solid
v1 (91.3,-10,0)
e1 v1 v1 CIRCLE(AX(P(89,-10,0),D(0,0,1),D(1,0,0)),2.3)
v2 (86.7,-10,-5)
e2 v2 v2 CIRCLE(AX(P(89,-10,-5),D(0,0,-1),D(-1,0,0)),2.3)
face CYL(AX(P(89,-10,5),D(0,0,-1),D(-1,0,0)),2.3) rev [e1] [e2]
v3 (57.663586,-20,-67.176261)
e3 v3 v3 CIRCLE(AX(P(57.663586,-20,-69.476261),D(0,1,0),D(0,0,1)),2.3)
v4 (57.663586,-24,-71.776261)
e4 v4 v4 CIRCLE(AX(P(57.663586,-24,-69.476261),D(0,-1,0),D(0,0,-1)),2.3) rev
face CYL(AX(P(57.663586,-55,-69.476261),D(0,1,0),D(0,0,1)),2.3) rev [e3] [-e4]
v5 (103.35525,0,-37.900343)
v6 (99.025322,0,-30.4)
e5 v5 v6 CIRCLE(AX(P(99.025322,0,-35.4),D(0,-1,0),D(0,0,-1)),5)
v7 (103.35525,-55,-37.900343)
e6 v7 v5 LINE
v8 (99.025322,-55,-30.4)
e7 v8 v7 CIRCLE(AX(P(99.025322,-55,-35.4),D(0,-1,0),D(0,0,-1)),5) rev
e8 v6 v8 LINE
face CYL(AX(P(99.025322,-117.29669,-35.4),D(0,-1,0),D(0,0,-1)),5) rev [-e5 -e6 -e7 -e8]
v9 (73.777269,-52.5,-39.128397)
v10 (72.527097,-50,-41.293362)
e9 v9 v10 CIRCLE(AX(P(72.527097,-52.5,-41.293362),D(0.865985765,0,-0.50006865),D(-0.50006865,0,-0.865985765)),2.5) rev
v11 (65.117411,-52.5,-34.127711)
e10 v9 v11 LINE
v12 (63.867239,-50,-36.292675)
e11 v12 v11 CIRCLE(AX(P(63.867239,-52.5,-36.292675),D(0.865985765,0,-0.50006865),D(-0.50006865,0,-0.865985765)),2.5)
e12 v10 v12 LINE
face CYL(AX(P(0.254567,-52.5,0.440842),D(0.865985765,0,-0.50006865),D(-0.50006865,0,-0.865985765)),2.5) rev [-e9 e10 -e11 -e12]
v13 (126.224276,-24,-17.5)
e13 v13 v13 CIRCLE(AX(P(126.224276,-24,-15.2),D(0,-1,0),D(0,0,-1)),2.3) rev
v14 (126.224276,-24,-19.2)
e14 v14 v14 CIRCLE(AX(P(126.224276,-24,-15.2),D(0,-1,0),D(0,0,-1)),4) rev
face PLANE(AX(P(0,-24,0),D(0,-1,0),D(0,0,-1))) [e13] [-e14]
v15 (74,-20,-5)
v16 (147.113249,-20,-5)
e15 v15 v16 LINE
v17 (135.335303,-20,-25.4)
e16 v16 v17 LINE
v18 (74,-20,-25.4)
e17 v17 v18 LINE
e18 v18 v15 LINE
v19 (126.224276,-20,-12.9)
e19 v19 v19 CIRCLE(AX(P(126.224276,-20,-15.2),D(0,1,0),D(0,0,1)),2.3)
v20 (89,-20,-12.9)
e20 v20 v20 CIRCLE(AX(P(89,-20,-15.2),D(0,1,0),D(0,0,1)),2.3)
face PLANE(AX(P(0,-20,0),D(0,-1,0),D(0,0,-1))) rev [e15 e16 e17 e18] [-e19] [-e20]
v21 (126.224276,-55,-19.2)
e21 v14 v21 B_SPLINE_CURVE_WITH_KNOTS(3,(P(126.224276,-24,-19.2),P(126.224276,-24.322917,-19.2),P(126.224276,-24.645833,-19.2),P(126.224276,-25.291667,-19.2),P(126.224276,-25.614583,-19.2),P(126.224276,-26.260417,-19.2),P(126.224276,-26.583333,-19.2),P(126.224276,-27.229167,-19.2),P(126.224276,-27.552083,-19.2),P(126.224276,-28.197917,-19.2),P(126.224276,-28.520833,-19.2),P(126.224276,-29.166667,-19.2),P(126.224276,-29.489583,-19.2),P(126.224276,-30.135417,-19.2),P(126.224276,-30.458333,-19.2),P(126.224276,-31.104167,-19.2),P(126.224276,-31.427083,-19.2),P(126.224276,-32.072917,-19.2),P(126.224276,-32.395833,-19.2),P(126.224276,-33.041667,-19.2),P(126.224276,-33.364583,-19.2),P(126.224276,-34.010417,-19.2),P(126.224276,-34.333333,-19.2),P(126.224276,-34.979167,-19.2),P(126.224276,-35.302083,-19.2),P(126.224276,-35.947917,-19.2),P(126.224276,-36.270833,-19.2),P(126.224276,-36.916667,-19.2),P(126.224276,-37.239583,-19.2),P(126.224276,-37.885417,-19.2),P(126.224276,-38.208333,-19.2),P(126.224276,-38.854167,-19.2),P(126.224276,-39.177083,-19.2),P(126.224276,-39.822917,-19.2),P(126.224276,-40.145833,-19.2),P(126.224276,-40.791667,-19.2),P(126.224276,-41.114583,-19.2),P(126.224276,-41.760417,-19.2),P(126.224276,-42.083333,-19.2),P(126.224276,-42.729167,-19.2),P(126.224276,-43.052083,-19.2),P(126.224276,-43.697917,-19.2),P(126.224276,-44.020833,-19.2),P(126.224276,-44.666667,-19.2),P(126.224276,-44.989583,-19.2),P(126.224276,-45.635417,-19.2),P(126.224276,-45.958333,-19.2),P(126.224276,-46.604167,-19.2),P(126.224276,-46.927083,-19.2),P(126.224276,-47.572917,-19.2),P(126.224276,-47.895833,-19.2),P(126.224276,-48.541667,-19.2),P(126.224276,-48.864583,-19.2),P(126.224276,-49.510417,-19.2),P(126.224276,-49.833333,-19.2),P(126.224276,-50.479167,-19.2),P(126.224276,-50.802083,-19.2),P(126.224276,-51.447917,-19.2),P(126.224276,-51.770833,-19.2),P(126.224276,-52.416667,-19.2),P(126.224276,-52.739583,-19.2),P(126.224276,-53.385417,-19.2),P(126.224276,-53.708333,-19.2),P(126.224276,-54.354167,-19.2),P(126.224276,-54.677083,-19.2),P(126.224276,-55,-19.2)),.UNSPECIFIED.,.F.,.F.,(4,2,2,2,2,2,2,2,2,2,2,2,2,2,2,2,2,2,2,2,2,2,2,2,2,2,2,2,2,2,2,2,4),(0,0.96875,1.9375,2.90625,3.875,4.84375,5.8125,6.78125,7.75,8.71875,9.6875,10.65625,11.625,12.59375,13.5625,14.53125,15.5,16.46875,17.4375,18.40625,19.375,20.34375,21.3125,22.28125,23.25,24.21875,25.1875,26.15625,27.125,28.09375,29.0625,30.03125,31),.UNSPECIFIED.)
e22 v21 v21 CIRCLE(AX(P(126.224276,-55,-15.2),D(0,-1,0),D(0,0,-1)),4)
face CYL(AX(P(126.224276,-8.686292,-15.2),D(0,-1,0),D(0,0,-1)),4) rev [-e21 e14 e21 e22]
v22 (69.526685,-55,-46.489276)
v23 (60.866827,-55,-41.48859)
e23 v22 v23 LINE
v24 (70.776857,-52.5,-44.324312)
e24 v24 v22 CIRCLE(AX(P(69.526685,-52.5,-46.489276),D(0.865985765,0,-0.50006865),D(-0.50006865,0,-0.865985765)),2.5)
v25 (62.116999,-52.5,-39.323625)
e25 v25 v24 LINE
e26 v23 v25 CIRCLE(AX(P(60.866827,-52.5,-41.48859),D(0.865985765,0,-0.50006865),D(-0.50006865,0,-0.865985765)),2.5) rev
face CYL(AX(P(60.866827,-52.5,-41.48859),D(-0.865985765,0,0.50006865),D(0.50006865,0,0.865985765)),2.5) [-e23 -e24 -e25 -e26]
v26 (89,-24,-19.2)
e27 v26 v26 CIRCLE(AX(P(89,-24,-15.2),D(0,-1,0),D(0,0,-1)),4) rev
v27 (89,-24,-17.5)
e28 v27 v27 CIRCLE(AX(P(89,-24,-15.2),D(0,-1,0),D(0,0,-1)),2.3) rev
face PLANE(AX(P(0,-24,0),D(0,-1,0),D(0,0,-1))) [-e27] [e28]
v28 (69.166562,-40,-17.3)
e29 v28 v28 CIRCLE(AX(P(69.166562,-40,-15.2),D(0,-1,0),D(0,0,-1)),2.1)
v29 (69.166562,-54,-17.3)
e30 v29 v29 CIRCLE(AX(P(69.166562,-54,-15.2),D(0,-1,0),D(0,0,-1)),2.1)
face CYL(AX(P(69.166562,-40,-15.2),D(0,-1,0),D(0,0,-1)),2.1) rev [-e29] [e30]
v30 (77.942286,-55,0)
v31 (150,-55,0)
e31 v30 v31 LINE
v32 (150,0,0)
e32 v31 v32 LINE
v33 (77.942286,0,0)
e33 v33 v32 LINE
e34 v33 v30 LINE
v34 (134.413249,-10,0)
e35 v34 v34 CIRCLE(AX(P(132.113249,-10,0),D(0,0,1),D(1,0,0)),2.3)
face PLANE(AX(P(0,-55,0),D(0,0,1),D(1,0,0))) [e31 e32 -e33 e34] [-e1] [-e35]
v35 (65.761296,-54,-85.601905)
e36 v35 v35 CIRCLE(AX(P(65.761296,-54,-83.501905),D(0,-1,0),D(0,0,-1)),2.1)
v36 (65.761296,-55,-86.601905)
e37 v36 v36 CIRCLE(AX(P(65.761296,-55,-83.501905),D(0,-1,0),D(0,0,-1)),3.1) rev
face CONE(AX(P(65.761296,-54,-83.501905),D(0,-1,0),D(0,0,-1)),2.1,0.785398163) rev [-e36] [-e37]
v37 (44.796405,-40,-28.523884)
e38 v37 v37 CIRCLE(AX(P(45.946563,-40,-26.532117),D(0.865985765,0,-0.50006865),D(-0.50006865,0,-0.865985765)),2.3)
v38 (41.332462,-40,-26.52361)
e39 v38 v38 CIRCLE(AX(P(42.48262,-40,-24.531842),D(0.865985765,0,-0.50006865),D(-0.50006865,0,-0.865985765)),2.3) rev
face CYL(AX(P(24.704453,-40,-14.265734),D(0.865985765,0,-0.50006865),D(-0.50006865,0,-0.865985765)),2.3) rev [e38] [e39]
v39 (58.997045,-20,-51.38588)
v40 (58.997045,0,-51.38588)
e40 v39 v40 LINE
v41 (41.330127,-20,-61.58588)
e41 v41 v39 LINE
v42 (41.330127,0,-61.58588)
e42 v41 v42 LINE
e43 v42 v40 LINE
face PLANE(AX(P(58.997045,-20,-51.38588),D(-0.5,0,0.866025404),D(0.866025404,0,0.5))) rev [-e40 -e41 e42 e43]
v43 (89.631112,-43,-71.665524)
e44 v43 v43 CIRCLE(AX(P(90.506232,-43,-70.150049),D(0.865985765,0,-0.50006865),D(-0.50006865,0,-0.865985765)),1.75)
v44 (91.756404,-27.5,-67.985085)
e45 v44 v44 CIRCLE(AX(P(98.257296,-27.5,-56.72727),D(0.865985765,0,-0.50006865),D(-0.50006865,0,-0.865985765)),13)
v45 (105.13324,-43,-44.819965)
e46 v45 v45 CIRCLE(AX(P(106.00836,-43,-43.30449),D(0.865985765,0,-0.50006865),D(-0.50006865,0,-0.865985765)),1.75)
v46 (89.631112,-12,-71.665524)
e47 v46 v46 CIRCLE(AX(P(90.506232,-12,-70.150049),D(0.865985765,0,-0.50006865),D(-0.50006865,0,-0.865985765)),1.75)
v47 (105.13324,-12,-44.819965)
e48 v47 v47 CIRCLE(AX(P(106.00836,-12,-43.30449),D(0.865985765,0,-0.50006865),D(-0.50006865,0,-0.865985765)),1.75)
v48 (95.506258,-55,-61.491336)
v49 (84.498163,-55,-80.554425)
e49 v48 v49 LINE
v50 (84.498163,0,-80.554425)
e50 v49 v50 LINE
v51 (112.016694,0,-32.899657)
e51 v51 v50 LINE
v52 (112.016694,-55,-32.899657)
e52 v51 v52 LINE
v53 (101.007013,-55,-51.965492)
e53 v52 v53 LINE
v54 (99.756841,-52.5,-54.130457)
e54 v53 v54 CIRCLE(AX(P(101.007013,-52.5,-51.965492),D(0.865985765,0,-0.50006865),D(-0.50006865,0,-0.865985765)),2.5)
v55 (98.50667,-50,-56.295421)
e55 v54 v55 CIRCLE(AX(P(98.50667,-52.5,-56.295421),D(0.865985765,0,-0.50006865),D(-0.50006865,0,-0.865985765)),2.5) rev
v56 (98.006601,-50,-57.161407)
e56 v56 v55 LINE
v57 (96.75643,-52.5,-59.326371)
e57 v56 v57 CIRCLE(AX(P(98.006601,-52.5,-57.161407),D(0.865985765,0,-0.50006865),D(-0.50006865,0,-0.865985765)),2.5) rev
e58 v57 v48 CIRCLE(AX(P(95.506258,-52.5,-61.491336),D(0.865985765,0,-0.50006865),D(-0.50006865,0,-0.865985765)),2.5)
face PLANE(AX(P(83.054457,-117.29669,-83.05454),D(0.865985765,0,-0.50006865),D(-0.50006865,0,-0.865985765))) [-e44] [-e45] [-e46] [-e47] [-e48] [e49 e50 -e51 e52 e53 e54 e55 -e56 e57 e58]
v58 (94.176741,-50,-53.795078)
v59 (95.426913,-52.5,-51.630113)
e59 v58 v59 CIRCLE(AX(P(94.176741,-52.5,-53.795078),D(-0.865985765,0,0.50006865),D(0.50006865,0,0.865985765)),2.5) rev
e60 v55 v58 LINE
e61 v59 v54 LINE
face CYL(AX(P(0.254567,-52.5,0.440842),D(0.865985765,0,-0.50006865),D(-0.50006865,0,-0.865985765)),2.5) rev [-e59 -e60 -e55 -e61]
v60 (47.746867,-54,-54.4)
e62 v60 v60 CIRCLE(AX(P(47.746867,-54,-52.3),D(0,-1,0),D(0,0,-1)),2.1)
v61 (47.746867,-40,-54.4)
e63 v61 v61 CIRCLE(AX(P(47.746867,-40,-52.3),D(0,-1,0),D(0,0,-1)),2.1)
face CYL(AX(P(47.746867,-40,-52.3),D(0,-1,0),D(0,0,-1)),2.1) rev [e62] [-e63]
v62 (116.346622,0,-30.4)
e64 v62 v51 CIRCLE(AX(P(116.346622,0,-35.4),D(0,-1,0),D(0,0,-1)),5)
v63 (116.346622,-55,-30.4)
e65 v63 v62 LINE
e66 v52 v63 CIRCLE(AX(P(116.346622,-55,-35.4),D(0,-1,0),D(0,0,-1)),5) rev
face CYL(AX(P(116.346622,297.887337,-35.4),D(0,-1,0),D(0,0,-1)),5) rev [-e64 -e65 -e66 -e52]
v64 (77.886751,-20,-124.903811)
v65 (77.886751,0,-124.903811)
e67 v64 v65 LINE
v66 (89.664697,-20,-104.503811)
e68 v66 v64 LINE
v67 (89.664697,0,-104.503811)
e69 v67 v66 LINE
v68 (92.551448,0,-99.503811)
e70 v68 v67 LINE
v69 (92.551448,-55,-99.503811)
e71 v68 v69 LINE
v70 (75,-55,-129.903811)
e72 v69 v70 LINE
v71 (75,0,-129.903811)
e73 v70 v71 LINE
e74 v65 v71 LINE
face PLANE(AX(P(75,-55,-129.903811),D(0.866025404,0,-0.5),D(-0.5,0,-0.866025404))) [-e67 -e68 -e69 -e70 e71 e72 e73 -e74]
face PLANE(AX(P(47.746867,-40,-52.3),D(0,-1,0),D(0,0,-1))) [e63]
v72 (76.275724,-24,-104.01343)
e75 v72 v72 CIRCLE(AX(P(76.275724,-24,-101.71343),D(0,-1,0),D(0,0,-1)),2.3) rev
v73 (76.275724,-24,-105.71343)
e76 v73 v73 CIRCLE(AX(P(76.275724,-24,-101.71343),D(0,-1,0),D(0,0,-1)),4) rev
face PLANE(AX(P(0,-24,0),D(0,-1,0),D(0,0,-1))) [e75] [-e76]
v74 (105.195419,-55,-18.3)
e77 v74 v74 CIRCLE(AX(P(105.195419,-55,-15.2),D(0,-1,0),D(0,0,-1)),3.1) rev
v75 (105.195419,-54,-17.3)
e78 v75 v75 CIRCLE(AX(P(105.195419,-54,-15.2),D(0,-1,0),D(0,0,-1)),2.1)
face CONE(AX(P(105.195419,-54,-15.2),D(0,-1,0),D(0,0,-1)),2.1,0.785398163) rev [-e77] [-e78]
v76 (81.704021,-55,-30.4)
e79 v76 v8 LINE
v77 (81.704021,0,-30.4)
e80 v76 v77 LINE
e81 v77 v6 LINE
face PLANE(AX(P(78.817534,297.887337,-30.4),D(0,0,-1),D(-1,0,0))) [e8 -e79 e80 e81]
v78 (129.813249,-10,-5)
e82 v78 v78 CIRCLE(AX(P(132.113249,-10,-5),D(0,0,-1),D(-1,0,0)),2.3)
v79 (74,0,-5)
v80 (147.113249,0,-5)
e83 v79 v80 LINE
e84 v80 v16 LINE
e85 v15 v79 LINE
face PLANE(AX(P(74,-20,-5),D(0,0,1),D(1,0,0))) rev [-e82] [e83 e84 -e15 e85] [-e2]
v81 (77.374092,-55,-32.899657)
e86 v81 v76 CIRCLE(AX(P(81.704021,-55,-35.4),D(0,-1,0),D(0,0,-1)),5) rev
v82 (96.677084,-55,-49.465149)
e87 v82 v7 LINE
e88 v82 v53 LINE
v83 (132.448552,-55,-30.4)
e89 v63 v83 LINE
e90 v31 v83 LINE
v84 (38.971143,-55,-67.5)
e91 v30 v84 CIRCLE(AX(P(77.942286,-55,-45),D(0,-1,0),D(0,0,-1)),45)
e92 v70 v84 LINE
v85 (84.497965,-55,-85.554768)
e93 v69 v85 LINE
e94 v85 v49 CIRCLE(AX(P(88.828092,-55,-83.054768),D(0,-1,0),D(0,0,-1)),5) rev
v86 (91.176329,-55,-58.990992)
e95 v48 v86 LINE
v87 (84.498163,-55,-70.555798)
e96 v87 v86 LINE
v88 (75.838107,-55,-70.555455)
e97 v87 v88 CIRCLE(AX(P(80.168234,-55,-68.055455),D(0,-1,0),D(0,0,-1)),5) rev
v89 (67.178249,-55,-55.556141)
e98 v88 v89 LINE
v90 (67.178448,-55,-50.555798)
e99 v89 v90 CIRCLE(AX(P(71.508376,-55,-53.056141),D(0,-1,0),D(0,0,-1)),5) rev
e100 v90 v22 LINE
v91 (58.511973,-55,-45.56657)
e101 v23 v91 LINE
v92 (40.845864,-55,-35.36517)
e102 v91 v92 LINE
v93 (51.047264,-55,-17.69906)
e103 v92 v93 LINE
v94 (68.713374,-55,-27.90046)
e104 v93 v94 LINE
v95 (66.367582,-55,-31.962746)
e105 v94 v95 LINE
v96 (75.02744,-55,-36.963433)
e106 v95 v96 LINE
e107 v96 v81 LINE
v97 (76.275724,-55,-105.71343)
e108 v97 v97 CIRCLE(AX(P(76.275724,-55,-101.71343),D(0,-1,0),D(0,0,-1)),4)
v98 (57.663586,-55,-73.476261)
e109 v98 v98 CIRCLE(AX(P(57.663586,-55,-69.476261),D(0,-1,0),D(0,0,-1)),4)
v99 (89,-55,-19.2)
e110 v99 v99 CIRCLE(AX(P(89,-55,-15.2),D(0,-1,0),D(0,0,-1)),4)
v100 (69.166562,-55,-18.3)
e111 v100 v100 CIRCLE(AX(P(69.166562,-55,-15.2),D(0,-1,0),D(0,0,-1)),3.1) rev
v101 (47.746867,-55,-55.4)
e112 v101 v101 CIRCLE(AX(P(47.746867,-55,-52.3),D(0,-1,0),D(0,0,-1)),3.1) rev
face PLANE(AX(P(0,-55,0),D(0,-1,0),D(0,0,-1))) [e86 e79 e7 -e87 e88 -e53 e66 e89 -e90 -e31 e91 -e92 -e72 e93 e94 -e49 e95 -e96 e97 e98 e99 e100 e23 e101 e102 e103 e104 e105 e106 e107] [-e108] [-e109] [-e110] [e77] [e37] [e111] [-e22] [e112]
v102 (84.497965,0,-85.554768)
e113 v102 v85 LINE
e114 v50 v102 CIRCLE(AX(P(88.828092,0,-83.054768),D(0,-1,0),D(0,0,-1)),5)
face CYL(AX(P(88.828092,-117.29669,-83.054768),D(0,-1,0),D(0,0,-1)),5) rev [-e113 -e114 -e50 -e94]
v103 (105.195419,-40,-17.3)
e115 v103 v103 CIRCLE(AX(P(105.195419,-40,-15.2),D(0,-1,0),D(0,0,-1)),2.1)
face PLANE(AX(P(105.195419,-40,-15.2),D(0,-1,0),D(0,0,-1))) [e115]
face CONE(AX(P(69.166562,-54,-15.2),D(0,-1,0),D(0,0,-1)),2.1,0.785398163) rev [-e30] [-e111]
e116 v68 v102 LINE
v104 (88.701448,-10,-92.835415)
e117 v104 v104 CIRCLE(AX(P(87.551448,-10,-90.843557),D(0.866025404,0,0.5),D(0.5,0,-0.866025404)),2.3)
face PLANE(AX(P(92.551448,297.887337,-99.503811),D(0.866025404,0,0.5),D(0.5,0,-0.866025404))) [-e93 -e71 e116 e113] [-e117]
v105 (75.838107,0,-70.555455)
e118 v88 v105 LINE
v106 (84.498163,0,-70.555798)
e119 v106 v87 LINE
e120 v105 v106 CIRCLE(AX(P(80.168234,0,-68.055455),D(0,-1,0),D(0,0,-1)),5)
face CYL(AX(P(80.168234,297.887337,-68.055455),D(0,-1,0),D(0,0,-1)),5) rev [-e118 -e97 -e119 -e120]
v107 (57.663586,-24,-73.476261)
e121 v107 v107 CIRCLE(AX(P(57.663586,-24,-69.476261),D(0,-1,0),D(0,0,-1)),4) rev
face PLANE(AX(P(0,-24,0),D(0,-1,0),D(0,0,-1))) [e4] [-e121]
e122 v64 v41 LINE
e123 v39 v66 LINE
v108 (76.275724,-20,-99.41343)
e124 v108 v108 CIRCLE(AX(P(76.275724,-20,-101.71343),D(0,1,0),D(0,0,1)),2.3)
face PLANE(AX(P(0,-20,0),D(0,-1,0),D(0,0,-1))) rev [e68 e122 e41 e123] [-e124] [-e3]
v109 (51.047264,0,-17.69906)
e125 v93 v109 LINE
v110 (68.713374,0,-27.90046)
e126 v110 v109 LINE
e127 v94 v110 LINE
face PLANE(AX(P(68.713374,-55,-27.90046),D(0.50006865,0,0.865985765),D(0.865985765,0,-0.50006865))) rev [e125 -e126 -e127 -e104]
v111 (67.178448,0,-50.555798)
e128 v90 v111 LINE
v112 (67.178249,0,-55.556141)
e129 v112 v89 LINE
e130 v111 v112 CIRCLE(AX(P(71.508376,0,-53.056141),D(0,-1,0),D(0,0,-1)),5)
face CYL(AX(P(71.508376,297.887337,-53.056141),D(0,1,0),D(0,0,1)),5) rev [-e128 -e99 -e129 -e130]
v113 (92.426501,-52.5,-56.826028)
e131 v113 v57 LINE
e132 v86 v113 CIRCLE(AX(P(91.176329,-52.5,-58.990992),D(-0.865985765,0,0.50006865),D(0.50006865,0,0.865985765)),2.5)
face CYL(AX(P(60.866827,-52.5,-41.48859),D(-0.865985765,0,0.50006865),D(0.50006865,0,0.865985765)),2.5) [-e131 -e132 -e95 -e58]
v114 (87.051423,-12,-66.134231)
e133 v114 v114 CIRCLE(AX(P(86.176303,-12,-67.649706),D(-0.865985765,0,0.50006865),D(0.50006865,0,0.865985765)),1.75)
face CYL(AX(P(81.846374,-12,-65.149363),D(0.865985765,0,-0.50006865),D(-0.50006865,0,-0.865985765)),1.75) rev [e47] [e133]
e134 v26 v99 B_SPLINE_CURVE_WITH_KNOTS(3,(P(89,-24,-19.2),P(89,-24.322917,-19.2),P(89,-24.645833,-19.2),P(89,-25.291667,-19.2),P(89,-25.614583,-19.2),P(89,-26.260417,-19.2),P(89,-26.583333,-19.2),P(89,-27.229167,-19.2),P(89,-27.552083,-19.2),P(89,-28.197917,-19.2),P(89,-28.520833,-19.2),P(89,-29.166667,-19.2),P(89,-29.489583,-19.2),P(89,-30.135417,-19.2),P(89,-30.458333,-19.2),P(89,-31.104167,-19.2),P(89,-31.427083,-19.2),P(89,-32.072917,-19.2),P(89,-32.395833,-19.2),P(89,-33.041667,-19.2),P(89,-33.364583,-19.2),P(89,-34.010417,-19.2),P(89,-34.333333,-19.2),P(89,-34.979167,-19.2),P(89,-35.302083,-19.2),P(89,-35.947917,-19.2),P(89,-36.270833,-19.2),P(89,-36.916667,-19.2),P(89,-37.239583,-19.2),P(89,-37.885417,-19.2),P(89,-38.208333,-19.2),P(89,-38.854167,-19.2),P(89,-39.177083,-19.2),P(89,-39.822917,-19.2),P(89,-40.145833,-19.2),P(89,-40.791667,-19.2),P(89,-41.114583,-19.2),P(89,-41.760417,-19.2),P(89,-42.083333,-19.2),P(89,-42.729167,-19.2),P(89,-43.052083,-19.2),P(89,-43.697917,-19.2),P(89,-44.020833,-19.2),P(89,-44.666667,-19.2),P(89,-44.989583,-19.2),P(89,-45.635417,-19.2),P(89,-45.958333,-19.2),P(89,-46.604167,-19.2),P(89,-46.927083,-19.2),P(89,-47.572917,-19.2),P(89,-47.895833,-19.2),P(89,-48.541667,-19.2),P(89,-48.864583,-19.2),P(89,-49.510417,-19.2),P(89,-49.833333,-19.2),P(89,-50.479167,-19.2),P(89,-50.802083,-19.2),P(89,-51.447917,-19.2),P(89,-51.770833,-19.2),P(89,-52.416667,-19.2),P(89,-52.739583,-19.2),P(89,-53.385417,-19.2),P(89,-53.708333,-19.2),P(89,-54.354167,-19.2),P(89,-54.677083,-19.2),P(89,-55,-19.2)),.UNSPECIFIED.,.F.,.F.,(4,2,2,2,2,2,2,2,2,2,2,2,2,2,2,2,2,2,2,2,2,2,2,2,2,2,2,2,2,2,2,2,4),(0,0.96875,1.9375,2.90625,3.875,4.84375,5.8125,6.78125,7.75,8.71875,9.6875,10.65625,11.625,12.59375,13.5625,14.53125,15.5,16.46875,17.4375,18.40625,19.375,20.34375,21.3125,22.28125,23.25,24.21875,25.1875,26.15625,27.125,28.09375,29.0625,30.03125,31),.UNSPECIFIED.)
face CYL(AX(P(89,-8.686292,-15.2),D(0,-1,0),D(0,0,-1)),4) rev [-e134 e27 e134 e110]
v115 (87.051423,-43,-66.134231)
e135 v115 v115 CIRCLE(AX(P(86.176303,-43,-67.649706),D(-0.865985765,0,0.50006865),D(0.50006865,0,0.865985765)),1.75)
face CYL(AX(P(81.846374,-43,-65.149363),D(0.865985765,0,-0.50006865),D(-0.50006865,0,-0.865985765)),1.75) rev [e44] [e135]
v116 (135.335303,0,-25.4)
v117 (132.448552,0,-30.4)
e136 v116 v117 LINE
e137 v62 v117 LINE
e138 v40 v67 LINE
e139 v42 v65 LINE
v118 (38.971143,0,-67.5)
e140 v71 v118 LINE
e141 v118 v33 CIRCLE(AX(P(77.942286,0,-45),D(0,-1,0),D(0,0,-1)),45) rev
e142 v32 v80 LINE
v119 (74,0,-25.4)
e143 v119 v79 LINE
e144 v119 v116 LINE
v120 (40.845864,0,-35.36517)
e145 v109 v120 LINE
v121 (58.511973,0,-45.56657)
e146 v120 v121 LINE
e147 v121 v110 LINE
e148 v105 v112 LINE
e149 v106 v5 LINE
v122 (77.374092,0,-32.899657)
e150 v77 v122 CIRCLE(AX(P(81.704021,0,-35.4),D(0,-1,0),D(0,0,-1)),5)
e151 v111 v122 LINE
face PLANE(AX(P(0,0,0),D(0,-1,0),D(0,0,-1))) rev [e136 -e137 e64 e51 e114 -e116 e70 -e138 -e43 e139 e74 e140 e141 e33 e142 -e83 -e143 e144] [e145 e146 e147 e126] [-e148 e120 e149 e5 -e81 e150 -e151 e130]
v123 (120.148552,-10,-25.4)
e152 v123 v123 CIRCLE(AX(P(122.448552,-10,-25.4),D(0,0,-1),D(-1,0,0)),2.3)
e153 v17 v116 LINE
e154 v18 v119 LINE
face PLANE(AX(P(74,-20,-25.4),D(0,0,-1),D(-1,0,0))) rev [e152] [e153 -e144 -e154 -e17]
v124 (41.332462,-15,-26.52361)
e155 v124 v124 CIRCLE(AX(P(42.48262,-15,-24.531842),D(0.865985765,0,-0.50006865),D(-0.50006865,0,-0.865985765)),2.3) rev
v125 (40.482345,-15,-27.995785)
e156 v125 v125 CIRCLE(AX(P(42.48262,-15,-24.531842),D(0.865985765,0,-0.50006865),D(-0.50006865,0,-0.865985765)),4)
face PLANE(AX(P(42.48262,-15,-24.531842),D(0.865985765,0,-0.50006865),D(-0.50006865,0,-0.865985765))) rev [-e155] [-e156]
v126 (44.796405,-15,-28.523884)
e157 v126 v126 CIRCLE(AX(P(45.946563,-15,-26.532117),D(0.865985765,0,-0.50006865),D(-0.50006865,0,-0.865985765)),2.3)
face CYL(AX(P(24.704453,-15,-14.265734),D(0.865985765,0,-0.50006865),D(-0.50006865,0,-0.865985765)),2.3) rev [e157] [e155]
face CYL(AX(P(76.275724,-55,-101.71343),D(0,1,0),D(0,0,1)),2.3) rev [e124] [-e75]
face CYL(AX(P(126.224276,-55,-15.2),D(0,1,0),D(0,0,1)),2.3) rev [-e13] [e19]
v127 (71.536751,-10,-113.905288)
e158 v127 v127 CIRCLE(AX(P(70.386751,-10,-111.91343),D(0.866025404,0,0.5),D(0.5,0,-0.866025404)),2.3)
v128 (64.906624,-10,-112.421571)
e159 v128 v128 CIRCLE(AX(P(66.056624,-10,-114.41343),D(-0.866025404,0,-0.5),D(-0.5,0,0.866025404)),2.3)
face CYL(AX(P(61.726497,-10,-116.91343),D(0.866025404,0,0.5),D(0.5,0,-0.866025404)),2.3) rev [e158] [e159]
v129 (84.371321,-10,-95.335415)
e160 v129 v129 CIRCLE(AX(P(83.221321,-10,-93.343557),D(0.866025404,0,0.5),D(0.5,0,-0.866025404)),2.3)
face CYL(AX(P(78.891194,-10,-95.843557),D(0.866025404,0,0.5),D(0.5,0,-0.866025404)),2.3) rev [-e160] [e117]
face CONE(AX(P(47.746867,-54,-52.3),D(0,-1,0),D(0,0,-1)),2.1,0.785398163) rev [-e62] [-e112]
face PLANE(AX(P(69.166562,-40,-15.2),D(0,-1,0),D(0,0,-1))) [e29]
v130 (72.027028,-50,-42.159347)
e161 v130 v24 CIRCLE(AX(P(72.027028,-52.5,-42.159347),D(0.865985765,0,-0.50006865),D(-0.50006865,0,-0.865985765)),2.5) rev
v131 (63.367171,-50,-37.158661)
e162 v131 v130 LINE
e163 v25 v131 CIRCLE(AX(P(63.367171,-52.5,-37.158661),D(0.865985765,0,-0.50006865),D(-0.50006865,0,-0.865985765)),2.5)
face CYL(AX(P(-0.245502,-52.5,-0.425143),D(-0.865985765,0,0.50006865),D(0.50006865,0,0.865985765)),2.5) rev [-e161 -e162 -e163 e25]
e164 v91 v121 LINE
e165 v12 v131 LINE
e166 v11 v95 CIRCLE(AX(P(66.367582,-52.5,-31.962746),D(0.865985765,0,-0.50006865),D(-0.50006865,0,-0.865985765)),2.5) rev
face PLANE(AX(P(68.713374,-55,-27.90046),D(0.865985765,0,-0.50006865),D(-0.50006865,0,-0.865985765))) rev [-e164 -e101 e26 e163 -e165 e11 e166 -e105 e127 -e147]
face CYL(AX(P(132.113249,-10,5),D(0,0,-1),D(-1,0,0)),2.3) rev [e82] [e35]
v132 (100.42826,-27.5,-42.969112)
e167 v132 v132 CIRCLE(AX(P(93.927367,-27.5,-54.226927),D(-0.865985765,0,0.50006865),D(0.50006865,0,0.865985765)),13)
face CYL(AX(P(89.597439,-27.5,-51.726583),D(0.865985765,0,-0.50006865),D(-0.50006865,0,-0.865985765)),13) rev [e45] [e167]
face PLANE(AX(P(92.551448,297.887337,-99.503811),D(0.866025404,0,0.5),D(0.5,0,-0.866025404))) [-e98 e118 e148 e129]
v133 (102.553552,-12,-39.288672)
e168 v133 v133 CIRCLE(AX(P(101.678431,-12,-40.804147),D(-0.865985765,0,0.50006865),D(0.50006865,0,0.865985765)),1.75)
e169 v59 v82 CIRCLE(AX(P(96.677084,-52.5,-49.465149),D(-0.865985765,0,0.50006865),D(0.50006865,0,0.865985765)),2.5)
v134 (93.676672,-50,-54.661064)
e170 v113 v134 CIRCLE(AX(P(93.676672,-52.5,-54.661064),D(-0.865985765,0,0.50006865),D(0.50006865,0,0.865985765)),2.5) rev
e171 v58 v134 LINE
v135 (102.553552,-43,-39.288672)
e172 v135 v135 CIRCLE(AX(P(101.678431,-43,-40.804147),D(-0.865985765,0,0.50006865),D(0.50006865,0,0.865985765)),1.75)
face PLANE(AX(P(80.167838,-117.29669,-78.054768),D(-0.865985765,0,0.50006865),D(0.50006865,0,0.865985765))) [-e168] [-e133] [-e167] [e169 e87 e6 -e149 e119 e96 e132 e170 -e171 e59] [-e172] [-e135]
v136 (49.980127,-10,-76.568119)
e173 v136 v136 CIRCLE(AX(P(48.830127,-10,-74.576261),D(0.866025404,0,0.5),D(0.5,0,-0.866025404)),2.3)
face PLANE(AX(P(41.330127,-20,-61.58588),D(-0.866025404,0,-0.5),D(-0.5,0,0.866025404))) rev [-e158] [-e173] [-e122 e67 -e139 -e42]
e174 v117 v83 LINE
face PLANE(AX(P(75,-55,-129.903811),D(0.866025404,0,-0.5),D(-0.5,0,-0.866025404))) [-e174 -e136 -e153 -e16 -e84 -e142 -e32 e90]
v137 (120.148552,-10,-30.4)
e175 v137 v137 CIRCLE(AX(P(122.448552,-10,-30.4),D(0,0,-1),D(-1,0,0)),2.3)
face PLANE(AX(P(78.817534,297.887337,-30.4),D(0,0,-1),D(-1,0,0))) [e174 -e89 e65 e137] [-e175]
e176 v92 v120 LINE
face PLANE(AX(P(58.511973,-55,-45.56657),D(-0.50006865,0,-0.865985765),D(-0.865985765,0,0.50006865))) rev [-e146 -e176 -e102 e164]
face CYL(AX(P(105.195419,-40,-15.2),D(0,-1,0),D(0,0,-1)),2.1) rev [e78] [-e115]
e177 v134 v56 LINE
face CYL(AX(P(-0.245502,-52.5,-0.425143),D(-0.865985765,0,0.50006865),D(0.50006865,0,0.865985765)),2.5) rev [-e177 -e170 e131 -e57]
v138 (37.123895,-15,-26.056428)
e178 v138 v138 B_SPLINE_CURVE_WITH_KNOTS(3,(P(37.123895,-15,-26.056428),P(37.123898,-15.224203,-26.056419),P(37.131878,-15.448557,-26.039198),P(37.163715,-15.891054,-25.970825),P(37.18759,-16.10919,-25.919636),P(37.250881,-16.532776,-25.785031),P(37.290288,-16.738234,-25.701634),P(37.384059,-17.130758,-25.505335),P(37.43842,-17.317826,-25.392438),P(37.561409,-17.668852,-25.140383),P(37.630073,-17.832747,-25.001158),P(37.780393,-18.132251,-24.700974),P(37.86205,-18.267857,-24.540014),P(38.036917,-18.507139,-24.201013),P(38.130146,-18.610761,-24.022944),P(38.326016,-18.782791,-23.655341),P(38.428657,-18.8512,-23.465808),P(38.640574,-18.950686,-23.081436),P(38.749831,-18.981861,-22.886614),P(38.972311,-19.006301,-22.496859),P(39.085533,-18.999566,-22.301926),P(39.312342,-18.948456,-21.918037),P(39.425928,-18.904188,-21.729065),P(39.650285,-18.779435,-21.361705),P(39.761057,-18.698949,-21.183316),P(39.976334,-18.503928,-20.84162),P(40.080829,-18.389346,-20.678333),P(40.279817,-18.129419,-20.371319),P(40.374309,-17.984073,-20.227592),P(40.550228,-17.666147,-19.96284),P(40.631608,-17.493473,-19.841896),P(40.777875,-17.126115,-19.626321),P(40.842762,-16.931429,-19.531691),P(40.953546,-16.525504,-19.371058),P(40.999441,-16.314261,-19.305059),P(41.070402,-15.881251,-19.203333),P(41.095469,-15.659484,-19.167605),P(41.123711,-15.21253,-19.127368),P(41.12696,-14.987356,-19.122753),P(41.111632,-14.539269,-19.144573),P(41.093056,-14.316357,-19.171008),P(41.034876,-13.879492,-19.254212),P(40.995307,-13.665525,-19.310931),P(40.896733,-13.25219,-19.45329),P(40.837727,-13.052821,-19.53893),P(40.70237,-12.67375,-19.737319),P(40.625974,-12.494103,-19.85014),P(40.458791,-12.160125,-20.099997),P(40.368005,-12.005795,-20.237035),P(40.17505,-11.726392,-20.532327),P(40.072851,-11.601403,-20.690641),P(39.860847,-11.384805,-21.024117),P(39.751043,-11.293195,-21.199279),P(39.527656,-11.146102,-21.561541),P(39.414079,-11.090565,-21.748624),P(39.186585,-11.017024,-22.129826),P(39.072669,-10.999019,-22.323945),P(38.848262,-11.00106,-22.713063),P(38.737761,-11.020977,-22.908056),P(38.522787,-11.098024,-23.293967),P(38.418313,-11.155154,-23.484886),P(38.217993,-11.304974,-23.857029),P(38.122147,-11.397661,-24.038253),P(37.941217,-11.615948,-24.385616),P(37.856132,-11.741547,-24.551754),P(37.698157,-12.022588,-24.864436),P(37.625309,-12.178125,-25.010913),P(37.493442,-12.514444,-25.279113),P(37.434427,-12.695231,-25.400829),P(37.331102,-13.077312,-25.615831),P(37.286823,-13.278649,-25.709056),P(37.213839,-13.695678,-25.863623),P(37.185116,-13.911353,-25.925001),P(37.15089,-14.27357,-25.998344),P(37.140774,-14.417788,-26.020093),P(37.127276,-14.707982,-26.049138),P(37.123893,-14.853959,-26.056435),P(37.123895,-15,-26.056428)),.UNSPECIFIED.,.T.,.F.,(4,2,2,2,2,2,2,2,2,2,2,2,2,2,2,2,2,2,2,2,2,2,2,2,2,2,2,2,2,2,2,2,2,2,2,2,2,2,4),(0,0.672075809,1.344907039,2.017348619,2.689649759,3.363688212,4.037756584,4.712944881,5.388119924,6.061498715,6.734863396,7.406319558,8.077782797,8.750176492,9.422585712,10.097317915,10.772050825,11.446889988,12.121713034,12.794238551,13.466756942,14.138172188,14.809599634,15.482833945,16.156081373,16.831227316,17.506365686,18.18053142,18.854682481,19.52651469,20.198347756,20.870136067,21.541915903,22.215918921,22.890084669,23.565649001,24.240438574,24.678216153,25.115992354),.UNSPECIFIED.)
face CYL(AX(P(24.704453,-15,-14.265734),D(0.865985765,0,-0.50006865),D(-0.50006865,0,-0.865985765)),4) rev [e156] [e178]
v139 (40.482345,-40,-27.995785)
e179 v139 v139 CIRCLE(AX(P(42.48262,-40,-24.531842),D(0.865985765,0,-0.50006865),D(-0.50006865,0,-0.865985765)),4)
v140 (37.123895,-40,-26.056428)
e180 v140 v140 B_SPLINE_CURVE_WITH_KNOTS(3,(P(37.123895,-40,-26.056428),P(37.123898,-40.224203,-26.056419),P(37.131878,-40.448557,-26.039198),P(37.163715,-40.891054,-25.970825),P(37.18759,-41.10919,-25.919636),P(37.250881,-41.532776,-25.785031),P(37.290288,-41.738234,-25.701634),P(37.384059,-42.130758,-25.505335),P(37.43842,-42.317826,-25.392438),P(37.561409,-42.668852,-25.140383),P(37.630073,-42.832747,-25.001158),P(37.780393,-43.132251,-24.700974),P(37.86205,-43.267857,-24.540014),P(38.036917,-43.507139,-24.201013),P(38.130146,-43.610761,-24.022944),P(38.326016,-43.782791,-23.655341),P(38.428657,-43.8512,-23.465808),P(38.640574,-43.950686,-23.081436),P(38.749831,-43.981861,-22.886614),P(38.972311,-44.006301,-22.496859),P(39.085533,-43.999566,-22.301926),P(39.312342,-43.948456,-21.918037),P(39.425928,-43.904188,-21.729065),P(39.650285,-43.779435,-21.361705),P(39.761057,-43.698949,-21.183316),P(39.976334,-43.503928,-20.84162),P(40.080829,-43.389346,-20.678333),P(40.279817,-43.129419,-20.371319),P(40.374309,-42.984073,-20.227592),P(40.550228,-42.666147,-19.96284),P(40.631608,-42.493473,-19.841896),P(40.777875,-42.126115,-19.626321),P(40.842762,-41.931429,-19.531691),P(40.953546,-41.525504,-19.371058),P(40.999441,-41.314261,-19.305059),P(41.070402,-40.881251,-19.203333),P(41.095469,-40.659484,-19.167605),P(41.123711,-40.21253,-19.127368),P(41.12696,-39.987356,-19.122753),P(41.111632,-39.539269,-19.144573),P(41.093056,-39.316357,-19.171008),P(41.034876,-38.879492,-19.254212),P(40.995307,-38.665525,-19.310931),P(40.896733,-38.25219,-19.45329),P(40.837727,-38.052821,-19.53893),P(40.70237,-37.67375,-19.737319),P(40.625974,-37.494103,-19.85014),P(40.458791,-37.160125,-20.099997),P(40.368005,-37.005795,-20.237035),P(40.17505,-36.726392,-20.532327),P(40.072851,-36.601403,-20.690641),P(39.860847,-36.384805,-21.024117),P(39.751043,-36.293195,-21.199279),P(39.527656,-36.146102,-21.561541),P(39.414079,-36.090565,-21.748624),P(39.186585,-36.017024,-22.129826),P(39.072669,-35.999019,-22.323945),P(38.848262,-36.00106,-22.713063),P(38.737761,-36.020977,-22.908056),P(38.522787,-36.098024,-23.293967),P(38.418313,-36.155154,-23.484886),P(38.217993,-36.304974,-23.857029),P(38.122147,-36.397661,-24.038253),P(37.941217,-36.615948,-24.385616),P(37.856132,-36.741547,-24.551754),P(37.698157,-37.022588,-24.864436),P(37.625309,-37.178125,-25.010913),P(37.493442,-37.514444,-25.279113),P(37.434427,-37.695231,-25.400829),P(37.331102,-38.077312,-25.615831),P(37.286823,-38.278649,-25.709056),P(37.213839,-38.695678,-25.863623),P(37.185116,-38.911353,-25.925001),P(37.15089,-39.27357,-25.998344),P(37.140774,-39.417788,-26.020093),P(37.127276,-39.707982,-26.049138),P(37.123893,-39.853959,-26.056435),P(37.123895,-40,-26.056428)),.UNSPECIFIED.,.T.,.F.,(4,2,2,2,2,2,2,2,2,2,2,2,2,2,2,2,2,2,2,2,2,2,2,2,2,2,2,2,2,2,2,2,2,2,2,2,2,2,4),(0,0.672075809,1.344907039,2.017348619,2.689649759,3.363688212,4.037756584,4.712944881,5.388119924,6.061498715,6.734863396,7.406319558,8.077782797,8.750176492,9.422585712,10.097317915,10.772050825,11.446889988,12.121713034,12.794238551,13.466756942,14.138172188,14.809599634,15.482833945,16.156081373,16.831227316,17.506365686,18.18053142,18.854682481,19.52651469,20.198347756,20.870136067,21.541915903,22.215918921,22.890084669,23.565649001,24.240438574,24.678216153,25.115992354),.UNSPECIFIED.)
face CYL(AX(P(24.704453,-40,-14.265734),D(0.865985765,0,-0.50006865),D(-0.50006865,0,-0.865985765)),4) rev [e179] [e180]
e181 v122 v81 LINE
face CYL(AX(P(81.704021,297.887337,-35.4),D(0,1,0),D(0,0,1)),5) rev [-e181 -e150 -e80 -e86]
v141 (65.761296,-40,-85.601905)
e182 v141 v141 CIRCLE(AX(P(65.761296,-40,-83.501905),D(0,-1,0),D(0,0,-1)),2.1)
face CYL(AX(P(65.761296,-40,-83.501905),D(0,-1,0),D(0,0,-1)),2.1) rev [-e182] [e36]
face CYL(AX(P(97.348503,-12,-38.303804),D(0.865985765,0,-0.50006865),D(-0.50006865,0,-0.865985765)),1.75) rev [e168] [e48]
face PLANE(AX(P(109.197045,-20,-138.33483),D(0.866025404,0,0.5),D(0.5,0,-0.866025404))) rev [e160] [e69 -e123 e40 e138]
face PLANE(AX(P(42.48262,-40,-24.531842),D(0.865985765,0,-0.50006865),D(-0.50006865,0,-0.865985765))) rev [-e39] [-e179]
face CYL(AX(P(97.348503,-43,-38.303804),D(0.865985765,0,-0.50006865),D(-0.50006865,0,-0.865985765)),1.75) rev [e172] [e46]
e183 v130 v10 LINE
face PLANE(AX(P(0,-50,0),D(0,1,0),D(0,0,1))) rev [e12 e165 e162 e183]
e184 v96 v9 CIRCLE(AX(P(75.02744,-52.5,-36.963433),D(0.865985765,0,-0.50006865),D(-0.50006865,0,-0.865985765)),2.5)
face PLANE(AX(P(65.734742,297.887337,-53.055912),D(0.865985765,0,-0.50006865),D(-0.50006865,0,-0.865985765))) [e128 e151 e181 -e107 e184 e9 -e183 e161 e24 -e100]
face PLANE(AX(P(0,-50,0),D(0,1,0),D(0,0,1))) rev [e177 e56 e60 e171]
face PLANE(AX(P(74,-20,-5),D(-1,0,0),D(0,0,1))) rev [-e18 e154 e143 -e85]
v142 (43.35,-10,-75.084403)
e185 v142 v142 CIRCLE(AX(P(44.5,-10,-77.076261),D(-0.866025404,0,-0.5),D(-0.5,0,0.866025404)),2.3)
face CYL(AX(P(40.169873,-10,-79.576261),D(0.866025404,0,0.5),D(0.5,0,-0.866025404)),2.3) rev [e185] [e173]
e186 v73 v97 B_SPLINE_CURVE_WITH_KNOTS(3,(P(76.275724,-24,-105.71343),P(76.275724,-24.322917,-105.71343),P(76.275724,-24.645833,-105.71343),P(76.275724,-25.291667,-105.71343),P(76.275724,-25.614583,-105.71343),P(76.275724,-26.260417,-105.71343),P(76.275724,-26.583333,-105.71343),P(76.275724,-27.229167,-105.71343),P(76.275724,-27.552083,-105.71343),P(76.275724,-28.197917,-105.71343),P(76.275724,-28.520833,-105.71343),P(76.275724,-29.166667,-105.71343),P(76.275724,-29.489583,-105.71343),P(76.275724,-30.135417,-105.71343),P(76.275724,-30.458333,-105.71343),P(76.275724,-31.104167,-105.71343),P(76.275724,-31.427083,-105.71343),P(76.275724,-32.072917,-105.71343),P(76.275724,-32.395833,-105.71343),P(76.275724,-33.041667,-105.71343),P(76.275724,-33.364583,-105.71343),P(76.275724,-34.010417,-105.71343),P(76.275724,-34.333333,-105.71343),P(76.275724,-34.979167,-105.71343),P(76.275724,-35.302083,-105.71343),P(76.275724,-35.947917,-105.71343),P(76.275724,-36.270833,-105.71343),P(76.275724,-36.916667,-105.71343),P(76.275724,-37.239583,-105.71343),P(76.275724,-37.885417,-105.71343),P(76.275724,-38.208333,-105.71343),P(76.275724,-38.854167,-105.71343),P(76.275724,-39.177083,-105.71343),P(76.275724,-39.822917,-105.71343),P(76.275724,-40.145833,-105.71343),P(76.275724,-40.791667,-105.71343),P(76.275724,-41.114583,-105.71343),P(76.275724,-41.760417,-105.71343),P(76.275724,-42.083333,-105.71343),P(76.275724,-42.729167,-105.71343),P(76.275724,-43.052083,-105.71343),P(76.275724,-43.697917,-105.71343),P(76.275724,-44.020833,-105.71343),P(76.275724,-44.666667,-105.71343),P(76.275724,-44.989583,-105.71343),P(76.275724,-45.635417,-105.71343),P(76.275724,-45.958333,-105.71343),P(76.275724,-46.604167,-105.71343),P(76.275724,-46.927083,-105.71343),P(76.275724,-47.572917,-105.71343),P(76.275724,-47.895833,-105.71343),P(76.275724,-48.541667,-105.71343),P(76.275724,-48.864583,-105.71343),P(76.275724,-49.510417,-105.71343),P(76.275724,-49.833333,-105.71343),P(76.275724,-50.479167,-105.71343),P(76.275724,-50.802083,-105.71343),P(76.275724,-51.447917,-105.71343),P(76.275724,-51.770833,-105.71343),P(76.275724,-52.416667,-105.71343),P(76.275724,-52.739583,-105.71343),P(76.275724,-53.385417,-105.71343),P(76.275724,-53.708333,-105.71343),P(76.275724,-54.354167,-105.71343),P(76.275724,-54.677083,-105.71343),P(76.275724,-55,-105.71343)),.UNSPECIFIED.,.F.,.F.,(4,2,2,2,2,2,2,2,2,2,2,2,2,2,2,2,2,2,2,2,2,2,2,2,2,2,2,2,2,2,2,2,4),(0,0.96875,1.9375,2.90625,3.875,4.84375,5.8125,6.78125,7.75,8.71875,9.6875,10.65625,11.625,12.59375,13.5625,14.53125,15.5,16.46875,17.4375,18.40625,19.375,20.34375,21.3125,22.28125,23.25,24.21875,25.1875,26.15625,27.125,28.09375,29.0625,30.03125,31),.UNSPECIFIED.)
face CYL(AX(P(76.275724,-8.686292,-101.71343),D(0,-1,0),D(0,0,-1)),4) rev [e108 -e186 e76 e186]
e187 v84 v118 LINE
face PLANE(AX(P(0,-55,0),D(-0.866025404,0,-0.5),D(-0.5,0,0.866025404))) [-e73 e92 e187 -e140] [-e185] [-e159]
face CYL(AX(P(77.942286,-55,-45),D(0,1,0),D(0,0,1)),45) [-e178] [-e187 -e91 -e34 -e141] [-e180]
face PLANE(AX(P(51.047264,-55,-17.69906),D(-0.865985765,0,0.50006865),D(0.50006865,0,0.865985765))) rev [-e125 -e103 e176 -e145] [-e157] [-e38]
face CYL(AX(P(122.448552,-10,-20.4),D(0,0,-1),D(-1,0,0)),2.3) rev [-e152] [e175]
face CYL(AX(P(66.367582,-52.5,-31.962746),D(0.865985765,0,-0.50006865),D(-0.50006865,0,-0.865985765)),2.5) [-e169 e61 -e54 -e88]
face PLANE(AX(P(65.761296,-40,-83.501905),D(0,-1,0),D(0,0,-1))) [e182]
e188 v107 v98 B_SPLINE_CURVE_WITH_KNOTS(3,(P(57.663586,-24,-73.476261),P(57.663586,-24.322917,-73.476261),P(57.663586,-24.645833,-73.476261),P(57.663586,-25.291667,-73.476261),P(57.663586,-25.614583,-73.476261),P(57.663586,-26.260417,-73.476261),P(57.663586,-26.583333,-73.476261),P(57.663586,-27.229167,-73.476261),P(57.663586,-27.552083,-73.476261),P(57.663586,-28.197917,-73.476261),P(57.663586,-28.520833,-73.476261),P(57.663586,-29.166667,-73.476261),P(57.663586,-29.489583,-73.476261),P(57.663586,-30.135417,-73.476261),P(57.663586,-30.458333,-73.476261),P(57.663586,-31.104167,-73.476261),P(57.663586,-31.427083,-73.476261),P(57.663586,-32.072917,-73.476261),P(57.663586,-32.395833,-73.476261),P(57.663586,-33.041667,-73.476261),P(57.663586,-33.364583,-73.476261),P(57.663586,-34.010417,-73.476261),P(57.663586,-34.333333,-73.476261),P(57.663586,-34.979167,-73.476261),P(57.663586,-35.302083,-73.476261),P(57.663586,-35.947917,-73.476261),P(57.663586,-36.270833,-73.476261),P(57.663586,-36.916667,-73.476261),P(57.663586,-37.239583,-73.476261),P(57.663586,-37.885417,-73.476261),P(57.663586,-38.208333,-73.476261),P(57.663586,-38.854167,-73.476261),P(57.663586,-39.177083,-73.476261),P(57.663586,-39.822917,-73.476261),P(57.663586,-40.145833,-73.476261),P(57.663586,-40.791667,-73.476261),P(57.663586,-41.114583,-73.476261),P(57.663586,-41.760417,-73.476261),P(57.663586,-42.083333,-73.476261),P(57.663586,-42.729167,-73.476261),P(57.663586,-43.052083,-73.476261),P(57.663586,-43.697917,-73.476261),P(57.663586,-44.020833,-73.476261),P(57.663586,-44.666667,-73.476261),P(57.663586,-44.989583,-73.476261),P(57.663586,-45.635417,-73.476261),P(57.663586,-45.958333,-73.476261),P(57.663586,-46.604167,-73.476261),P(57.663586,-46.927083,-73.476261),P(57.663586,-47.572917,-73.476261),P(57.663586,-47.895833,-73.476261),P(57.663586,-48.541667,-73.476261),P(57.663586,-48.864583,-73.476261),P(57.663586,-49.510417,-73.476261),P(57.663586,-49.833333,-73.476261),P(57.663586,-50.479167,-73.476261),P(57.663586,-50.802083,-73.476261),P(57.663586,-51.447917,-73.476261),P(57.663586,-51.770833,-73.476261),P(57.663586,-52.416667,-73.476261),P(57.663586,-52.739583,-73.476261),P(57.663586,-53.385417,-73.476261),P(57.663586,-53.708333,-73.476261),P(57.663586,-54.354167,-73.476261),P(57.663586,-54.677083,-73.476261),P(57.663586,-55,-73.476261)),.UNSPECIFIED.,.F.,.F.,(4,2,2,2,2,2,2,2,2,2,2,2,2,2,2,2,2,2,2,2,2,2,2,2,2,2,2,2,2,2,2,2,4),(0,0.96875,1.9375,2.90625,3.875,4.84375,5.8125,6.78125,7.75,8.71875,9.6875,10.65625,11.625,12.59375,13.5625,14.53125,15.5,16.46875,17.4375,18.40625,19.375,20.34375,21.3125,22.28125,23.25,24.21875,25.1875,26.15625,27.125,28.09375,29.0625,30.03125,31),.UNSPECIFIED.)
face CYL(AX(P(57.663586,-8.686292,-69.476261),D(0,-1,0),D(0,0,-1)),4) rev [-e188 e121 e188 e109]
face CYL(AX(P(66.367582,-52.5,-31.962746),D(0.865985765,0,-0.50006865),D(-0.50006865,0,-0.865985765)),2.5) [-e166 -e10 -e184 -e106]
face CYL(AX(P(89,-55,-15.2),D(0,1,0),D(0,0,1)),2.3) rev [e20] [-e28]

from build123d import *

# Parameters (mm, degrees)
BOSS_EXTRUDE1_DEPTH     = 55
CUT_EXTRUDE2_DEPTH      = 206.91260282
CUT_EXTRUDE2_DEPTH_BACK = 206.91260282
SKETCH2_W               = 100.4
SKETCH2_H               = 20.4
CUT_EXTRUDE3_DEPTH      = 20
FILLET1_R               = 45
CUT_EXTRUDE4_DEPTH      = 206.91260282
CUT_EXTRUDE4_DEPTH_BACK = 206.91260282
BOSS_EXTRUDE2_DEPTH     = 55
SKETCH29_R              = 1.75
SKETCH29_R_2            = 13
CUT_EXTRUDE5_DEPTH      = 10
SKETCH33_R              = 2.3
CUT_EXTRUDE9_DEPTH      = 10
SKETCH34_R              = 2.3
CUT_EXTRUDE10_DEPTH     = 10
FILLET2_R               = 5
CUT_EXTRUDE6_DEPTH      = 5
FILLET3_START           = 72
FILLET3_DEPTH           = 42
FILLET3_START_2         = 73.456949031
FILLET3_2_DEPTH         = 10
FILLET3_START_3         = 108.456949031
FILLET3_3_DEPTH         = 5
SKETCH31_R              = 2.3
CUT_EXTRUDE7_DEPTH      = 10
SKETCH32_R              = 2.3
CUT_EXTRUDE8_DEPTH      = 10
SKETCH35_R              = 2.3
CUT_EXTRUDE11_DEPTH     = 157.645539016
SKETCH36_R              = 4
CUT_EXTRUDE12_DEPTH     = 161.275509096
SKETCH37_R              = 2.1
CUT_EXTRUDE13_DEPTH     = 15
SKETCH38_R              = 2.3
CUT_EXTRUDE14_DEPTH     = 202.494416813
SKETCH39_R              = 4
CUT_EXTRUDE15_DEPTH     = 31
CHAMFER1_SIZE           = 1


with BuildPart() as part:
    # Sketch1 → Boss-Extrude1 (new body)
    with BuildSketch(Plane(origin=(0, 0, 0), x_dir=(1, 0, 0), z_dir=(0, 1, 0))):
        Polygon((0, 0), (150, 0), (75, 129.903810568), align=None)
    extrude(amount=-BOSS_EXTRUDE1_DEPTH)

    # Sketch4 → Cut-Extrude2 (cut, two sides: drawn at the far end of the back side and taken through both)
    with BuildSketch(Plane(origin=(0, 0, 0), x_dir=(1, 0, 0), z_dir=(0, 1, 0)).offset(-CUT_EXTRUDE2_DEPTH_BACK)):
        Polygon((58.511973189, 45.566570047), (40.845863577, 35.365169595), (51.047264029, 17.699059984), (68.713373641, 27.900460435), align=None)
    extrude(amount=CUT_EXTRUDE2_DEPTH + CUT_EXTRUDE2_DEPTH_BACK, mode=Mode.SUBTRACT)

    # Sketch2 → Cut-Extrude3 (cut)
    with BuildSketch(Plane(origin=(0, 0, 0), x_dir=(1, 0, 0), z_dir=(0, 1, 0))):
        Polygon((109.197045256, 138.33483042), (58.997045256, 51.38587988), (41.330127019, 61.58587988), (91.530127019, 148.53483042), align=None)
        with Locations((124.2, 15.2)):
            Rectangle(SKETCH2_W, SKETCH2_H)
    extrude(amount=-CUT_EXTRUDE3_DEPTH, mode=Mode.SUBTRACT)

    # Fillet1
    fillet1_edges = [part.edges().sort_by_distance(p)[0] for p in [
        (0, -27.5, 0),
    ]]
    fillet(fillet1_edges, radius=FILLET1_R)

    # Sketch27 → Cut-Extrude4 (cut, two sides: drawn at the far end of the back side and taken through both)
    with BuildSketch(Plane(origin=(0, 0, 0), x_dir=(1, 0, 0), z_dir=(0, 1, 0)).offset(-CUT_EXTRUDE4_DEPTH_BACK)):
        Polygon((238.272822489, 351.900634614), (92.551448183, 99.503810568), (65.734741667, 53.05591239), (78.81753352, 30.4), (132.448551817, 30.4), (423.891300428, 30.4), (928.68494852, 321.842748611), (743.066470581, 643.343383225), align=None)
    extrude(amount=CUT_EXTRUDE4_DEPTH + CUT_EXTRUDE4_DEPTH_BACK, mode=Mode.SUBTRACT)

    # Sketch28 → Boss-Extrude2 (add)
    with BuildSketch(Plane(origin=(0, 0, 0), x_dir=(1, 0, 0), z_dir=(0, 1, 0))):
        Polygon((83.054457118, 83.054539524), (113.460135283, 30.4), (107.686368323, 30.4), (80.167837876, 78.054768335), align=None)
    extrude(amount=-BOSS_EXTRUDE2_DEPTH)

    # Sketch29 → Cut-Extrude5 (cut)
    with BuildSketch(Plane(origin=(98.252102834, 0, -56.73626329), x_dir=(-0.5000686496051991, 0, -0.8659857652883405), z_dir=(0.8659857652883404, 0, -0.500068649605199))):
        with Locations((-15.510385308, -12)):
            Circle(SKETCH29_R)
        with Locations((15.489614692, -12)):
            Circle(SKETCH29_R)
        with Locations((15.489614692, -43)):
            Circle(SKETCH29_R)
        with Locations((-15.510385308, -43)):
            Circle(SKETCH29_R)
        with Locations((-0.010385308, -27.5)):
            Circle(SKETCH29_R_2)
    extrude(amount=-CUT_EXTRUDE5_DEPTH, mode=Mode.SUBTRACT)

    # Sketch33 → Cut-Extrude9 (cut)
    with BuildSketch(Plane(origin=(26.327172275, 0, 15.2), x_dir=(0.4999999999999997, 0, -0.8660254037844388), z_dir=(0.8660254037844389, 0, 0.49999999999999983))):
        with Locations((122.448551817, -10)):
            Circle(SKETCH33_R)
    extrude(amount=-CUT_EXTRUDE9_DEPTH, mode=Mode.SUBTRACT)

    # Sketch34 → Cut-Extrude10 (cut)
    with BuildSketch(Plane(origin=(0, 0, -30.4), x_dir=(-1, 0, 0), z_dir=(0, 0, -1))):
        with Locations((-122.448551817, -10)):
            Circle(SKETCH34_R)
    extrude(amount=-CUT_EXTRUDE10_DEPTH, mode=Mode.SUBTRACT)

    # Fillet2
    fillet2_edges = [part.edges().sort_by_distance(p)[0] for p in [
        (107.686368323, -27.5, -30.4),
        (113.460135283, -27.5, -30.4),
        (83.054457118, -27.5, -83.054539524),
        (80.167837876, -27.5, -78.054768335),
        (65.734741667, -27.5, -53.05591239),
        (78.81753352, -27.5, -30.4),
    ]]
    fillet(fillet2_edges, radius=FILLET2_R)

    # Sketch30 → Cut-Extrude6 (cut)
    with BuildSketch(Plane.XZ.offset(55)):
        Polygon((62.116998953, -39.323625207), (122.736002524, -74.32843068), (125.736414421, -69.132516088), (65.117410851, -34.127710616), align=None)
    extrude(amount=-CUT_EXTRUDE6_DEPTH, mode=Mode.SUBTRACT)

    # Fillet3: read off the stored shape, not the designer's step
    # Fillet3 outline → Fillet3 (cut)
    with BuildSketch(Plane(origin=(0, 0, 0), x_dir=(0.5000686496051991, 0, 0.8659857652883406), z_dir=(0.8659857652883404, 0, -0.5000686496051993)).offset(FILLET3_START)):
        with BuildLine():
            Line((-2.990935885, 55), (-5.490935885, 55))
            ThreePointArc((-5.490935885, 55), (-3.723168932, 54.267766953), (-2.990935885, 52.5))
            Line((-2.990935885, 52.5), (-2.990935885, 55))
        make_face()
        with BuildLine():
            Line((5.509064115, 55), (3.009064115, 55))
            Line((3.009064115, 55), (3.009064115, 52.5))
            ThreePointArc((3.009064115, 52.5), (3.741297162, 54.267766953), (5.509064115, 55))
        make_face()
    extrude(amount=FILLET3_DEPTH, mode=Mode.SUBTRACT)

    # Fillet3 2 outline → Fillet3 2 (add)
    with BuildSketch(Plane(origin=(0, 0, 0), x_dir=(0.5000686496051991, 0, 0.8659857652883406), z_dir=(0.8659857652883404, 0, -0.5000686496051993)).offset(FILLET3_START_2)):
        with BuildLine():
            ThreePointArc((-0.490935885, 50), (-2.258702838, 50.732233047), (-2.990935885, 52.5))
            Line((-2.990935885, 52.5), (-2.990935885, 50))
            Line((-2.990935885, 50), (-0.490935885, 50))
        make_face()
        with BuildLine():
            ThreePointArc((3.009064115, 52.5), (2.276831068, 50.732233047), (0.509064115, 50))
            Line((0.509064115, 50), (3.009064115, 50))
            Line((3.009064115, 50), (3.009064115, 52.5))
        make_face()
    extrude(amount=FILLET3_2_DEPTH)

    # Fillet3 3 outline → Fillet3 3 (add)
    with BuildSketch(Plane(origin=(0, 0, 0), x_dir=(0.5000686496051991, 0, 0.8659857652883406), z_dir=(0.8659857652883404, 0, -0.5000686496051993)).offset(FILLET3_START_3)):
        with BuildLine():
            ThreePointArc((-0.490935885, 50), (-2.258702838, 50.732233047), (-2.990935885, 52.5))
            Line((-2.990935885, 52.5), (-2.990935885, 50))
            Line((-2.990935885, 50), (-0.490935885, 50))
        make_face()
        with BuildLine():
            ThreePointArc((3.009064115, 52.5), (2.276831068, 50.732233047), (0.509064115, 50))
            Line((0.509064115, 50), (3.009064115, 50))
            Line((3.009064115, 50), (3.009064115, 52.5))
        make_face()
    extrude(amount=FILLET3_3_DEPTH)

    # Sketch31 → Cut-Extrude7 (cut)
    with BuildSketch(Plane(origin=(4.330127019, 0, 2.5), x_dir=(0.5000000000000019, 0, -0.8660254037844376), z_dir=(0.8660254037844376, 0, 0.5000000000000019))):
        with Locations((89, -10)):
            Circle(SKETCH31_R)
        with Locations((132.113248654, -10)):
            Circle(SKETCH31_R)
    extrude(amount=-CUT_EXTRUDE7_DEPTH, mode=Mode.SUBTRACT)

    # Sketch32 → Cut-Extrude8 (cut)
    with BuildSketch(Plane(origin=(0, 0, -5), x_dir=(-1, 0, 0), z_dir=(0, 0, -1))):
        with Locations((-132.113248654, -10)):
            Circle(SKETCH32_R)
        with Locations((-89, -10)):
            Circle(SKETCH32_R)
    extrude(amount=-CUT_EXTRUDE8_DEPTH, mode=Mode.SUBTRACT)

    # Sketch35 → Cut-Extrude11 (cut, through all)
    with BuildSketch(Plane(origin=(45.946562611, 0, -26.532116854), x_dir=(-0.5000686496051995, 0, -0.8659857652883403), z_dir=(0.8659857652883401, 0, -0.5000686496051994))):
        with Locations((0, -15)):
            Circle(SKETCH35_R)
        with Locations((0, -40)):
            Circle(SKETCH35_R)
    extrude(amount=-CUT_EXTRUDE11_DEPTH, mode=Mode.SUBTRACT)

    # Sketch36 → Cut-Extrude12 (cut, through all)
    with BuildSketch(Plane(origin=(42.482619549, 0, -24.531842256), x_dir=(-0.5000686496051995, 0, -0.8659857652883403), z_dir=(0.8659857652883401, 0, -0.5000686496051994))):
        with Locations((0, -15)):
            Circle(SKETCH36_R)
        with Locations((0, -40)):
            Circle(SKETCH36_R)
    extrude(amount=-CUT_EXTRUDE12_DEPTH, mode=Mode.SUBTRACT)

    # Sketch37 → Cut-Extrude13 (cut)
    with BuildSketch(Plane.XZ.offset(55)):
        with Locations(Location((69.166562249, -15.2, 0), (0, 0, 270))):
            Circle(SKETCH37_R)
        with Locations(Location((105.195419079, -15.2, 0), (0, 0, 270))):
            Circle(SKETCH37_R)
        with Locations(Location((47.746867262, -52.3, 0), (0, 0, 270))):
            Circle(SKETCH37_R)
        with Locations(Location((65.761295677, -83.501905284, 0), (0, 0, 270))):
            Circle(SKETCH37_R)
    extrude(amount=-CUT_EXTRUDE13_DEPTH, mode=Mode.SUBTRACT)

    # Sketch38 → Cut-Extrude14 (cut, through all)
    with BuildSketch(Plane(origin=(0, -20, 0), x_dir=(1, 0, 0), z_dir=(0, 1, 0))):
        with Locations(Location((89, 15.2, 0), (0, 0, 270))):
            Circle(SKETCH38_R)
        with Locations(Location((126.224275908, 15.2, 0), (0, 0, 270))):
            Circle(SKETCH38_R)
        with Locations(Location((76.275724092, 101.713429511, 0), (0, 0, 270))):
            Circle(SKETCH38_R)
        with Locations(Location((57.663586138, 69.476260937, 0), (0, 0, 270))):
            Circle(SKETCH38_R)
    extrude(amount=-CUT_EXTRUDE14_DEPTH, mode=Mode.SUBTRACT)

    # Sketch39 → Cut-Extrude15 (cut)
    with BuildSketch(Plane.XZ.offset(55)):
        with Locations(Location((89, -15.2, 0), (0, 0, 270))):
            Circle(SKETCH39_R)
        with Locations(Location((126.224275908, -15.2, 0), (0, 0, 270))):
            Circle(SKETCH39_R)
        with Locations(Location((57.663586138, -69.476260937, 0), (0, 0, 270))):
            Circle(SKETCH39_R)
        with Locations(Location((76.275724092, -101.713429511, 0), (0, 0, 270))):
            Circle(SKETCH39_R)
    extrude(amount=-CUT_EXTRUDE15_DEPTH, mode=Mode.SUBTRACT)

    # Chamfer1
    chamfer1_edges = [part.edges().sort_by_distance(p)[0] for p in [
        (105.195419079, -55, -13.1),
        (69.166562249, -55, -13.1),
        (47.746867262, -55, -50.2),
        (65.761295677, -55, -81.401905284),
    ]]
    chamfer(chamfer1_edges, length=CHAMFER1_SIZE)


solid = part.part
